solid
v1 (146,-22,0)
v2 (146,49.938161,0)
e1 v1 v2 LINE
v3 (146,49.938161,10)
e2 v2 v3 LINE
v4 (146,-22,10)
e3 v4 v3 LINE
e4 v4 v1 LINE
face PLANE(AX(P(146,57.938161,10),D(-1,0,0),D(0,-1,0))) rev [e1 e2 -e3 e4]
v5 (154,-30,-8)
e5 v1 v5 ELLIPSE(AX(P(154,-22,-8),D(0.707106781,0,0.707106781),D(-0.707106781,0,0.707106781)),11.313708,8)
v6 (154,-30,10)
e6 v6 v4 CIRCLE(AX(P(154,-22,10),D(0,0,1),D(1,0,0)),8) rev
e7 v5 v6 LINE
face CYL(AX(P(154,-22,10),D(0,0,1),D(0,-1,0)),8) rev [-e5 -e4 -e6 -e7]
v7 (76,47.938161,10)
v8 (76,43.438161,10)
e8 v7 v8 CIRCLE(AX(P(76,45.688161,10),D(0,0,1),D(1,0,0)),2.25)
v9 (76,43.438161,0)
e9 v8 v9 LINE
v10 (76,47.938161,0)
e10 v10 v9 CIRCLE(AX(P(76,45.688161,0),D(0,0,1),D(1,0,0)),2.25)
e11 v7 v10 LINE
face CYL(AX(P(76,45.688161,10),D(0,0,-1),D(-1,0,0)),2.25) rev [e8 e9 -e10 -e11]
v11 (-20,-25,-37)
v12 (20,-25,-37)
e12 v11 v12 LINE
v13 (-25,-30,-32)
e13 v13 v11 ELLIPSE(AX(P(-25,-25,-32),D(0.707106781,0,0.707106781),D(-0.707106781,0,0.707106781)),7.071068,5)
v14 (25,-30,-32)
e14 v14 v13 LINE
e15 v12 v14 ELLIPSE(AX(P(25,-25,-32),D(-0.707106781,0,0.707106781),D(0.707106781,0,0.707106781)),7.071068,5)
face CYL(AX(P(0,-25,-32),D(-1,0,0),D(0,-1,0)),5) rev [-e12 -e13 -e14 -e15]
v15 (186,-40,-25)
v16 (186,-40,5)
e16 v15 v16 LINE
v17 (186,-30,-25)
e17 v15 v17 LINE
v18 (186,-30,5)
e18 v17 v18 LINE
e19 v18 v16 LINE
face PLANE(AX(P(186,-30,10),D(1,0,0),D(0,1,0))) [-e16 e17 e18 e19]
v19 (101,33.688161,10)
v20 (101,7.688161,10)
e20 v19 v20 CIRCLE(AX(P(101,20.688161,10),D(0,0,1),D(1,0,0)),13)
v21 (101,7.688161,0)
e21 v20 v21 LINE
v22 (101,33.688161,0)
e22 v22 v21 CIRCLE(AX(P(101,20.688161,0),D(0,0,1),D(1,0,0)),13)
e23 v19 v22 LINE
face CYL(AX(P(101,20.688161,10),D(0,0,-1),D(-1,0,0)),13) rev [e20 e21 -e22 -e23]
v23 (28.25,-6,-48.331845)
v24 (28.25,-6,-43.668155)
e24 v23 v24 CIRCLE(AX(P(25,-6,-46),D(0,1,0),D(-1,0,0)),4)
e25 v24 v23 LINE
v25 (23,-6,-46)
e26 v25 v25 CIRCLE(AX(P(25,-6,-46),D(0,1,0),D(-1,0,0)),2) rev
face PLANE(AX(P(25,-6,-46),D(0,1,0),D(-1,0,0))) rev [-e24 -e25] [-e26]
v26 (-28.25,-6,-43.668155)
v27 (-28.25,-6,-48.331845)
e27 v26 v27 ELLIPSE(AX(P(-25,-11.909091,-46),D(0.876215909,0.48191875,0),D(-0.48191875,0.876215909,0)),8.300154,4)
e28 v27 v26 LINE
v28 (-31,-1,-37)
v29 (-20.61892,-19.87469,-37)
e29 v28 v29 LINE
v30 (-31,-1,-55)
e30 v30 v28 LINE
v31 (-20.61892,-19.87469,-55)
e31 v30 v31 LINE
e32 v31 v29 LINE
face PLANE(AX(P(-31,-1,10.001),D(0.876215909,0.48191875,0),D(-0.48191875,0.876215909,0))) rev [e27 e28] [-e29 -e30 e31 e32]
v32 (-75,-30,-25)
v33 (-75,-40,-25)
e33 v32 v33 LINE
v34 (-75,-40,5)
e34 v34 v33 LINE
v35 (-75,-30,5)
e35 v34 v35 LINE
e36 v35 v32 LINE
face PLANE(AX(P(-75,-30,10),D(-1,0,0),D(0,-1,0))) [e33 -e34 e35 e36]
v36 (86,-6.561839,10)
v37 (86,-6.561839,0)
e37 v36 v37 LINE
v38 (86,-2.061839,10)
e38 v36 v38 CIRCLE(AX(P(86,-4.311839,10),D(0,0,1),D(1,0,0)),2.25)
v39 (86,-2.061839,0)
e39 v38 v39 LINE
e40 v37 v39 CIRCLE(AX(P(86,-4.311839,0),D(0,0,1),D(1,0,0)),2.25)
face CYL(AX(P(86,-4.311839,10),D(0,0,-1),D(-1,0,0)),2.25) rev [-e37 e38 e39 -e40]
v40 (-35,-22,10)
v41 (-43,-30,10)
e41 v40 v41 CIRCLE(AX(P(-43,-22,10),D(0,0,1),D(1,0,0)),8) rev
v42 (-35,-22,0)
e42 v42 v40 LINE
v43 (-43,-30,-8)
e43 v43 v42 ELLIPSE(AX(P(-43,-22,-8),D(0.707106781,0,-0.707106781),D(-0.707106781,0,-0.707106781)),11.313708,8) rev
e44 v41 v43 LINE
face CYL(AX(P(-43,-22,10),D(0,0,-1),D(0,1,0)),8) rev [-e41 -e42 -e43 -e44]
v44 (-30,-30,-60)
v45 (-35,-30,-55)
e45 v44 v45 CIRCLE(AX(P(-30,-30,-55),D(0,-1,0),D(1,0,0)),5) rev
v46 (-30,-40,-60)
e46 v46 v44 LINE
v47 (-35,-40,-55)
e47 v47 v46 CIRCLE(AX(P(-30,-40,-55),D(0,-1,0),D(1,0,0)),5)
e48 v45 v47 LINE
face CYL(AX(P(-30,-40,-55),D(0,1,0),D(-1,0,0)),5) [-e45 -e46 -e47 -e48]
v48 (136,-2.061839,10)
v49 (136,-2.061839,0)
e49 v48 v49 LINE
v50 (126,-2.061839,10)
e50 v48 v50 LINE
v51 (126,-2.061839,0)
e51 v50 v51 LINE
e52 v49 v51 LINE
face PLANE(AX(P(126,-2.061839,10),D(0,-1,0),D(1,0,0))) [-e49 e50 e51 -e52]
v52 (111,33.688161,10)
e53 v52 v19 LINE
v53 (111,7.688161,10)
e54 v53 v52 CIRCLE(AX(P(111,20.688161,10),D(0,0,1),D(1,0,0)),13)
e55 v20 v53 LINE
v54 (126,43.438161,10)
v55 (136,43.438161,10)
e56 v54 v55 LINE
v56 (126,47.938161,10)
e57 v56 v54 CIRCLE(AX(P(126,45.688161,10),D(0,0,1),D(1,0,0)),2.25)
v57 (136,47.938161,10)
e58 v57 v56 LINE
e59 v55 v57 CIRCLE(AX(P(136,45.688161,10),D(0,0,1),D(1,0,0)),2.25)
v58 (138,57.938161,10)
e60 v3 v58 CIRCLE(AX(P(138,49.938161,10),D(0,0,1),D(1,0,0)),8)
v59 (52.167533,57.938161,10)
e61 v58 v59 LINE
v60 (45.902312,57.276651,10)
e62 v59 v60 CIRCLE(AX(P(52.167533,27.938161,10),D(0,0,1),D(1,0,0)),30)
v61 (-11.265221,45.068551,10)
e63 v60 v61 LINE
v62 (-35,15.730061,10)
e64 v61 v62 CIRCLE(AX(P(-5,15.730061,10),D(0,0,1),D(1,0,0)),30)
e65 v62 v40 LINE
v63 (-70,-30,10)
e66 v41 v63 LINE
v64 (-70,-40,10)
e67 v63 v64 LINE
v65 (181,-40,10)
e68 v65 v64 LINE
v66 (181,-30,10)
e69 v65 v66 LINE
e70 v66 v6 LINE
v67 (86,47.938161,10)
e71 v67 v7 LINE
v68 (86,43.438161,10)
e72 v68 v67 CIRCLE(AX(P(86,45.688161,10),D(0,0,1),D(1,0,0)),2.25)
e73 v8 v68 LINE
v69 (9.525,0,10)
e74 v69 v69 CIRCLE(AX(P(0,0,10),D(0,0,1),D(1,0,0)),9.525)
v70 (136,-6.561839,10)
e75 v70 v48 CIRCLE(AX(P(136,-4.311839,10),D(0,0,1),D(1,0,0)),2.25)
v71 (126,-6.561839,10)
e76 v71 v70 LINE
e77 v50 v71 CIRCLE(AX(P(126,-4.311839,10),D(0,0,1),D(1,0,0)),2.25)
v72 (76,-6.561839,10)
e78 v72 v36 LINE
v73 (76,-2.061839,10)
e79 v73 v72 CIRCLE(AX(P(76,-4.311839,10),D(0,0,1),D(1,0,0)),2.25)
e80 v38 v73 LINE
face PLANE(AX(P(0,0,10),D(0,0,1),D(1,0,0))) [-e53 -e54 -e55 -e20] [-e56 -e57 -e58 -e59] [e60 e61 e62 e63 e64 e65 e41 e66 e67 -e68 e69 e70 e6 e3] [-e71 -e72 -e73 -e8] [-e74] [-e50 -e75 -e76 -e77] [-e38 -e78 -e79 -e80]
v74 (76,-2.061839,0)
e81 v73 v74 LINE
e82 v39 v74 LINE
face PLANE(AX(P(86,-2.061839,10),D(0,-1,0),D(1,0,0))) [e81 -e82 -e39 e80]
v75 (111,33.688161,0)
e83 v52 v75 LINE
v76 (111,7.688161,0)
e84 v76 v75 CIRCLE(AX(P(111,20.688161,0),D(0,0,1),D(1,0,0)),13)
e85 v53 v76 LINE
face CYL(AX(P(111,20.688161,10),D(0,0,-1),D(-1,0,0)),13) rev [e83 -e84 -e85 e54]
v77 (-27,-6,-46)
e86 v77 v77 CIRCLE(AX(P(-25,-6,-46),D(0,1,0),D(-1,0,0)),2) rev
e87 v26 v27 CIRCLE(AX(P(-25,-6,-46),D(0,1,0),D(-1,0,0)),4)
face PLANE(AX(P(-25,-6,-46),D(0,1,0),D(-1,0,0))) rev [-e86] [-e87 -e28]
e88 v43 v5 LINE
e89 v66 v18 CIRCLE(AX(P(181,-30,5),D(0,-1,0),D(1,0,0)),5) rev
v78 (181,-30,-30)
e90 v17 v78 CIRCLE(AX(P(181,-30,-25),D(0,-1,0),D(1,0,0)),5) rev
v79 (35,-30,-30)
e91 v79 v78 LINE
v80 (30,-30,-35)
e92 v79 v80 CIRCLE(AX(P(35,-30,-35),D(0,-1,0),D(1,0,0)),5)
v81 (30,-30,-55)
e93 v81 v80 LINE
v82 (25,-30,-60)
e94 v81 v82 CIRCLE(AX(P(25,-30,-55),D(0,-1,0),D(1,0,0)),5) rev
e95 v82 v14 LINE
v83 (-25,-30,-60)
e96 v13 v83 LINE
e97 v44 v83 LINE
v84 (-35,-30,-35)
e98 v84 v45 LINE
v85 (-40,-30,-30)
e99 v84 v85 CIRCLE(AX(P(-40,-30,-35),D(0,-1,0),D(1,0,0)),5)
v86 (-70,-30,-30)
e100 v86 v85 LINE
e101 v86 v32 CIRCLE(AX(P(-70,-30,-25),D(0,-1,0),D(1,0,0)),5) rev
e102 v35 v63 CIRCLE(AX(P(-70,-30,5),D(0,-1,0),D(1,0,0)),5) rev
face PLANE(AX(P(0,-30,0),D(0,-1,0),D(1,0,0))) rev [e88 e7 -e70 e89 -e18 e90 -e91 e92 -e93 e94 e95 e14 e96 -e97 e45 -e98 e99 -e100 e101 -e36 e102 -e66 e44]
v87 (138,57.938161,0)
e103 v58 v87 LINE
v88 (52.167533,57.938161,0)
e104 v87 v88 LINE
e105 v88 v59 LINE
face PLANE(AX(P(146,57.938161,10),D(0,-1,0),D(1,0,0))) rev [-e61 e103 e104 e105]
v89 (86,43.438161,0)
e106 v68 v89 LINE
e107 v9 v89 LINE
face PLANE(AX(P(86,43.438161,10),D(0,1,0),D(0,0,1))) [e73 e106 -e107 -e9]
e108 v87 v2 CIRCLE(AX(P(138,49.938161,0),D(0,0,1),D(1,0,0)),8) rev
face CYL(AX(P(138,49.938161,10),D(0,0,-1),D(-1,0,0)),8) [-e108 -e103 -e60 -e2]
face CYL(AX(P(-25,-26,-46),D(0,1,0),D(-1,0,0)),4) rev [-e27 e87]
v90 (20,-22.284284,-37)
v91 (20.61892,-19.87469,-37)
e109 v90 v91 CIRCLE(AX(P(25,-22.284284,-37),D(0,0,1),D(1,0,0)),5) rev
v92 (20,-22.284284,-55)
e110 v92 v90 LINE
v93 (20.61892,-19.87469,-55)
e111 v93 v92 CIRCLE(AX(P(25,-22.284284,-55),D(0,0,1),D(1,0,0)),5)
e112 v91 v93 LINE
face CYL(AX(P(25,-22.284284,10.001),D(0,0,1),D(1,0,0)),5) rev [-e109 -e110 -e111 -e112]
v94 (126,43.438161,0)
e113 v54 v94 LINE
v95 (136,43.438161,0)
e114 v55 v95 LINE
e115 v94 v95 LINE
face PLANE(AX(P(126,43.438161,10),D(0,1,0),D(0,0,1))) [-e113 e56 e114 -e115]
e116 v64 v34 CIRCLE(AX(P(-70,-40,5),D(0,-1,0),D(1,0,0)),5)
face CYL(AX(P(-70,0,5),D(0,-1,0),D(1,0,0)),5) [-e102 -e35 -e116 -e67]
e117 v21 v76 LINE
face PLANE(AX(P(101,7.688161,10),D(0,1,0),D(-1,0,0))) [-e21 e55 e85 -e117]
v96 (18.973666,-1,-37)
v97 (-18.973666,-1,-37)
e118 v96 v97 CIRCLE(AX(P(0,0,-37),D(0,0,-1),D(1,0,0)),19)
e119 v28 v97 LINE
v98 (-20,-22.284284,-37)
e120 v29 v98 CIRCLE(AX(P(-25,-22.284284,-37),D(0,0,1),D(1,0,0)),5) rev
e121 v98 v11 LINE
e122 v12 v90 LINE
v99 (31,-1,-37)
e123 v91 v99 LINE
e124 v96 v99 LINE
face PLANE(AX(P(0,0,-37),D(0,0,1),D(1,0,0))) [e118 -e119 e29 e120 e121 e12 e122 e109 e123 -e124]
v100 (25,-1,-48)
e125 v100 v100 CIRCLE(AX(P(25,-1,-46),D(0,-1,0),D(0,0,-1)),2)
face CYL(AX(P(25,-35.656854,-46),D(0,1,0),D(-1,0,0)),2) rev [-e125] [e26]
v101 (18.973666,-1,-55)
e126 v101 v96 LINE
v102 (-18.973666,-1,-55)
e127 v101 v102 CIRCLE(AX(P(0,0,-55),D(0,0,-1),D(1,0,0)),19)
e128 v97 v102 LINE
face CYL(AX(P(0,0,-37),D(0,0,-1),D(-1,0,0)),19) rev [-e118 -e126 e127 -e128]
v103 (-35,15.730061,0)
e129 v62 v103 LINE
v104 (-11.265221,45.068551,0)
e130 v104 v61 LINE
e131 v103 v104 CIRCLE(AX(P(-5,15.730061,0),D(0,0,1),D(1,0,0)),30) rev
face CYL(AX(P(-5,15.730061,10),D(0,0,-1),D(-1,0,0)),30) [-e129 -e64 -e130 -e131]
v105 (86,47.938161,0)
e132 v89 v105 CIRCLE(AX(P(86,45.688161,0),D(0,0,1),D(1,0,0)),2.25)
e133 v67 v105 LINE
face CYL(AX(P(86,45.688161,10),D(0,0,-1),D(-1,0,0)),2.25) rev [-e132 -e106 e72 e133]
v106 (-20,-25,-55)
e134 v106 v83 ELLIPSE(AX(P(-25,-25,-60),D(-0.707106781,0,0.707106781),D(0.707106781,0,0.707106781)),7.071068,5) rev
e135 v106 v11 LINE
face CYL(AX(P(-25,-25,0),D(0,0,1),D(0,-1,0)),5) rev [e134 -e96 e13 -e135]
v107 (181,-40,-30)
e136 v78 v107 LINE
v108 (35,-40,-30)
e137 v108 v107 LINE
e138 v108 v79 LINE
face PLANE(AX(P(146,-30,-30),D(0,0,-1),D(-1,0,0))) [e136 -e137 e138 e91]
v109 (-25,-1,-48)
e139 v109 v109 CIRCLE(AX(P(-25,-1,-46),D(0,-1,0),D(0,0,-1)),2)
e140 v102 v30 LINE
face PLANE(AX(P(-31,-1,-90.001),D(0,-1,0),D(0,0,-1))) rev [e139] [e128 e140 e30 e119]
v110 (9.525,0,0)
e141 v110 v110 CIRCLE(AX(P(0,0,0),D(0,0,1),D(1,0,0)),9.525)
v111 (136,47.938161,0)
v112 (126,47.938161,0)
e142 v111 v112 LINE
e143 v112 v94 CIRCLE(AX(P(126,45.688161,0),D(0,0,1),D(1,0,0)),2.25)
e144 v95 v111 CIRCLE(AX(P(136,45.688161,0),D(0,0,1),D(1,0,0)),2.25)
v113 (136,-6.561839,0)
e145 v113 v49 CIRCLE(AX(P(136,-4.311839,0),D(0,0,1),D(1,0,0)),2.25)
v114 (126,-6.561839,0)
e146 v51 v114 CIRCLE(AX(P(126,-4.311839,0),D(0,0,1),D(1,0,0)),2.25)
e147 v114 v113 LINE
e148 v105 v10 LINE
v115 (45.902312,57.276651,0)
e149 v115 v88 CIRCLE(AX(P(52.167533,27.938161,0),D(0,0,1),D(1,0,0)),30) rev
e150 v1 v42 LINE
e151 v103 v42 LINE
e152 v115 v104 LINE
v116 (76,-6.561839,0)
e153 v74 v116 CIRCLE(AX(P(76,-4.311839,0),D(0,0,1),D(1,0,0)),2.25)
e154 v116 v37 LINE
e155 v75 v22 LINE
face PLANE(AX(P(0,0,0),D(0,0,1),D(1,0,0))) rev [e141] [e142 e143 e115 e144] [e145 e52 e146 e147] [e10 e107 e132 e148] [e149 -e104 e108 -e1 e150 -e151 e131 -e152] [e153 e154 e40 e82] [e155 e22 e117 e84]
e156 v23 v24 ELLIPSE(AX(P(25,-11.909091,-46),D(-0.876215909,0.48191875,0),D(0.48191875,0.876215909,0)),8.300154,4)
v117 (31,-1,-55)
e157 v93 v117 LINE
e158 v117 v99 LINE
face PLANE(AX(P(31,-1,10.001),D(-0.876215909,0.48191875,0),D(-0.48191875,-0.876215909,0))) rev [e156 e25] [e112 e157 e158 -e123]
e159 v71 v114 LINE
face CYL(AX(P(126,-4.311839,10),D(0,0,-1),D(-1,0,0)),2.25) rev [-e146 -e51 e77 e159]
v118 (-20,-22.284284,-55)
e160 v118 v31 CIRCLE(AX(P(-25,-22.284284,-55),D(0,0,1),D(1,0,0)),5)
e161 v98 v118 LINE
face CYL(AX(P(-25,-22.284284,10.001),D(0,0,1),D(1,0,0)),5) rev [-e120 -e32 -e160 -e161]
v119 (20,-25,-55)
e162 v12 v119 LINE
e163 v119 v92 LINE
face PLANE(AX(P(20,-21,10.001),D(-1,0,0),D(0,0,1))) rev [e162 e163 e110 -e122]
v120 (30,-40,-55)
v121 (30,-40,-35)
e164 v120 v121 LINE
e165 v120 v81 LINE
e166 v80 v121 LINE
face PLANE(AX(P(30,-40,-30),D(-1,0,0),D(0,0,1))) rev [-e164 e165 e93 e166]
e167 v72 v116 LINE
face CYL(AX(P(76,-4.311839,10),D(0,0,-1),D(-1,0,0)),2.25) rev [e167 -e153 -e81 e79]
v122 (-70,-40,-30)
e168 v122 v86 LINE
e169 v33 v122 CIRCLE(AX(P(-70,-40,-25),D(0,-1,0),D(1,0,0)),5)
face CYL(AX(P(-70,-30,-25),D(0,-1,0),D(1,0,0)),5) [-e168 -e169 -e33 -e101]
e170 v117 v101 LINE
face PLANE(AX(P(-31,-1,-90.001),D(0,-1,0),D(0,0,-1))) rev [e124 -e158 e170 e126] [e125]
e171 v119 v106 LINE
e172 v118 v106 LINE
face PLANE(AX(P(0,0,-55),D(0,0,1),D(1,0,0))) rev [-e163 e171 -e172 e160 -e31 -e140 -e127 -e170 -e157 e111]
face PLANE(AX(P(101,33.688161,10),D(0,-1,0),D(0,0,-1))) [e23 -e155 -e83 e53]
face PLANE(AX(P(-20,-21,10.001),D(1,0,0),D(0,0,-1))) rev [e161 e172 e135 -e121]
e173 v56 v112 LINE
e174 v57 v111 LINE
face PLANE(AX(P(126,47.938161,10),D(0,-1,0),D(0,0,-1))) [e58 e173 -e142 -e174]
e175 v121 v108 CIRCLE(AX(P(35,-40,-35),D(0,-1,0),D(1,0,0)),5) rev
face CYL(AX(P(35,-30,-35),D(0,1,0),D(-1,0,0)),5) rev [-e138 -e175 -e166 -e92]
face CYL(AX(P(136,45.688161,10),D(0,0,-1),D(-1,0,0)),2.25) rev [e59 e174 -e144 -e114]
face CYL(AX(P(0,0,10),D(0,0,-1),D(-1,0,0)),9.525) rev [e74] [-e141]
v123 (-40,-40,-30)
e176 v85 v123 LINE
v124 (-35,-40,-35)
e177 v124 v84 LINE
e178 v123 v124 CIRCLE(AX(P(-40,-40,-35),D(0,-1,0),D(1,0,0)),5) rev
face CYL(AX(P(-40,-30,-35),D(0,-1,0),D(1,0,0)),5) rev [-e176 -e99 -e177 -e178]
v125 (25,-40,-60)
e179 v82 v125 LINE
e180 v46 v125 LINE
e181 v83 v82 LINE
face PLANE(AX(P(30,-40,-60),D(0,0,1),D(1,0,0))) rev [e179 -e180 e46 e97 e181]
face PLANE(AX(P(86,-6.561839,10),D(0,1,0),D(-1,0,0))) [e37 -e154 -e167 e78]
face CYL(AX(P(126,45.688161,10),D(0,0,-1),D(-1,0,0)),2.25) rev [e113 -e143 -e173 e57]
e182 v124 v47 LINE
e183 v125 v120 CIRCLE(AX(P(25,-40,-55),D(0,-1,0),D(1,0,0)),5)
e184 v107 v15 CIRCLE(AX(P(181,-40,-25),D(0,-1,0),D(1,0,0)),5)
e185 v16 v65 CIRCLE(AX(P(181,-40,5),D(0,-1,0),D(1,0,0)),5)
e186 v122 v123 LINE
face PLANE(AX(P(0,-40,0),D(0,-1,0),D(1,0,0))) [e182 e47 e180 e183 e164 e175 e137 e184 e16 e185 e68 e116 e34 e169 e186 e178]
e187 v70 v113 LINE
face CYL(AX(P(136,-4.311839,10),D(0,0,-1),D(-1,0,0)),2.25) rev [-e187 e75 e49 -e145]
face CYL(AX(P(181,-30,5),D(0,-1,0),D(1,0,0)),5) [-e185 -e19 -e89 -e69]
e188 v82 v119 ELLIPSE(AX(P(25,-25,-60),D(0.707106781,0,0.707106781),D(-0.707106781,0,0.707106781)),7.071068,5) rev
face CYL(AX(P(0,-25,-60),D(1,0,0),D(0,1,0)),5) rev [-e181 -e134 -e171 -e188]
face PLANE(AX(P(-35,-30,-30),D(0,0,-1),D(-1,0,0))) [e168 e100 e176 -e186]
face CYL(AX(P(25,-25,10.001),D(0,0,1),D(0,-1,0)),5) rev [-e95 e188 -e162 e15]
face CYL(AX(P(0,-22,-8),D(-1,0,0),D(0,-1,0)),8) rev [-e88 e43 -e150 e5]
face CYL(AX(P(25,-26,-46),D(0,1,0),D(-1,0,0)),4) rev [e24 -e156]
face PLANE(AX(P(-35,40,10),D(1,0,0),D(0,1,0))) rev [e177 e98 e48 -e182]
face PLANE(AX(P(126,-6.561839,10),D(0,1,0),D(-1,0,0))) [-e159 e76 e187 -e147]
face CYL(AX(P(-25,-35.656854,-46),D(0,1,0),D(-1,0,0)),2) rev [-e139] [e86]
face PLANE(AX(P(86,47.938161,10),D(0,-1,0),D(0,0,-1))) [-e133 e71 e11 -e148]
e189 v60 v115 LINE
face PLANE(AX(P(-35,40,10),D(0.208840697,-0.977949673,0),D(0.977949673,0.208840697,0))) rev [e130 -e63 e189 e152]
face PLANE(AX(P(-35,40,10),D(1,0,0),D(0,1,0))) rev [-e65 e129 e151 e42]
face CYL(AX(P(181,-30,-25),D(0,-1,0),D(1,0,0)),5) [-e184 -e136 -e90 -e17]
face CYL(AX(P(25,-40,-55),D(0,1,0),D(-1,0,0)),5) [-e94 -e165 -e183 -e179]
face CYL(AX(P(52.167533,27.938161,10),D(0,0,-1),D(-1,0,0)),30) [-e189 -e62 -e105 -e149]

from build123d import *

# Parameters (mm, degrees)
SKETCH1_R           = 9.525
BOSS_EXTRUDE1_DEPTH = 10
SKETCH2_W           = 181
SKETCH2_H           = 100
BOSS_EXTRUDE2_DEPTH = 10
BOSS_EXTRUDE3_DEPTH = 18
SKETCH4_R           = 2
CUT_EXTRUDE1_DEPTH  = 30
SKETCH5_R           = 4
CUT_EXTRUDE2_DEPTH  = 20
CUT_EXTRUDE4_START  = -18
SKETCH8_W           = 62
SKETCH8_H           = 1
CUT_EXTRUDE4_DEPTH  = 18
CUT_EXTRUDE3_REACH  = 171.994
FILLET1_R           = 5
SKETCH9_W           = 40
SKETCH9_H           = 40
BOSS_EXTRUDE5_DEPTH = 10
CUT_EXTRUDE6_DEPTH  = 225.56428954
FILLET2_R           = 5
FILLET3_R           = 5
FILLET4_R           = 8
FILLET5_R           = 30


with BuildPart() as part:
    # Sketch1 → Boss-Extrude1 (new body)
    with BuildSketch(Plane.XY):
        Polygon((146, 57.938160866), (146, -30), (-35, -30), (-35, 40), (49, 57.938160866), align=None)
        Circle(SKETCH1_R, mode=Mode.SUBTRACT)
        with BuildLine():
            Line((101, 33.688160866), (111, 33.688160866))
            ThreePointArc((111, 33.688160866), (124, 20.688160866), (111, 7.688160866))
            Line((111, 7.688160866), (101, 7.688160866))
            ThreePointArc((101, 7.688160866), (88, 20.688160866), (101, 33.688160866))
        make_face(mode=Mode.SUBTRACT)
        with BuildLine():
            Line((86, 43.438160866), (76, 43.438160866))
            ThreePointArc((76, 43.438160866), (73.75, 45.688160866), (76, 47.938160866))
            Line((76, 47.938160866), (86, 47.938160866))
            ThreePointArc((86, 47.938160866), (88.25, 45.688160866), (86, 43.438160866))
        make_face(mode=Mode.SUBTRACT)
        with BuildLine():
            Line((86, -6.561839134), (76, -6.561839134))
            ThreePointArc((76, -6.561839134), (73.75, -4.311839134), (76, -2.061839134))
            Line((76, -2.061839134), (86, -2.061839134))
            ThreePointArc((86, -2.061839134), (88.25, -4.311839134), (86, -6.561839134))
        make_face(mode=Mode.SUBTRACT)
        with BuildLine():
            Line((126, -2.061839134), (136, -2.061839134))
            ThreePointArc((136, -2.061839134), (138.25, -4.311839134), (136, -6.561839134))
            Line((136, -6.561839134), (126, -6.561839134))
            ThreePointArc((126, -6.561839134), (123.75, -4.311839134), (126, -2.061839134))
        make_face(mode=Mode.SUBTRACT)
        with BuildLine():
            Line((126, 47.938160866), (136, 47.938160866))
            ThreePointArc((136, 47.938160866), (138.25, 45.688160866), (136, 43.438160866))
            Line((136, 43.438160866), (126, 43.438160866))
            ThreePointArc((126, 43.438160866), (123.75, 45.688160866), (126, 47.938160866))
        make_face(mode=Mode.SUBTRACT)
    extrude(amount=BOSS_EXTRUDE1_DEPTH)

    # Sketch2 → Boss-Extrude2 (add)
    with BuildSketch(Plane.XZ.offset(30)):
        with Locations((55.5, -40)):
            Rectangle(SKETCH2_W, SKETCH2_H)
    extrude(amount=BOSS_EXTRUDE2_DEPTH)

    # Sketch3 → Boss-Extrude3 (add)
    with BuildSketch(Plane.XY.offset(-55)):
        with BuildLine():
            Line((-31, 0), (-31, -40))
            Line((-31, -40), (31, -40))
            Line((31, -40), (31, 0))
            Line((31, 0), (19, 0))
            ThreePointArc((19, 0), (0, -19), (-19, 0))
            Line((-19, 0), (-31, 0))
        make_face()
    extrude(amount=BOSS_EXTRUDE3_DEPTH)

    # Sketch4 → Cut-Extrude1 (cut)
    with BuildSketch(Plane(origin=(0, 0, 0), x_dir=(1, 0, 0), z_dir=(0, 1, 0))):
        with Locations(Location((-25, 46, 0), (0, 0, 180))):
            Circle(SKETCH4_R)
        with Locations(Location((25, 46, 0), (0, 0, 180))):
            Circle(SKETCH4_R)
    extrude(amount=-CUT_EXTRUDE1_DEPTH, mode=Mode.SUBTRACT)

    # Sketch5 → Cut-Extrude2 (cut)
    with BuildSketch(Plane(origin=(0, -6, 0), x_dir=(1, 0, 0), z_dir=(0, 1, 0))):
        with Locations(Location((25, 46, 0), (0, 0, 180))):
            Circle(SKETCH5_R)
        with Locations(Location((-25, 46, 0), (0, 0, 180))):
            Circle(SKETCH5_R)
    extrude(amount=-CUT_EXTRUDE2_DEPTH, mode=Mode.SUBTRACT)

    # Sketch8 → Cut-Extrude4 (cut)
    with BuildSketch(Plane.XY.offset(-37).offset(CUT_EXTRUDE4_START)):
        with Locations((0, -0.5)):
            Rectangle(SKETCH8_W, SKETCH8_H)
    extrude(amount=CUT_EXTRUDE4_DEPTH, mode=Mode.SUBTRACT)

    # Sketch6 → Cut-Extrude3 (cut, up to next)
    with BuildSketch(Plane(origin=(0, 0, -55), x_dir=(-1, 0, 0), z_dir=(0, 0, -1)), mode=Mode.PRIVATE) as cut_extrude3_sk1:
        Polygon((31, -1), (20, -21), (20, -30), (31, -30), align=None)
    cut_extrude3_tool1 = extrude(cut_extrude3_sk1.sketch, amount=-CUT_EXTRUDE3_REACH, mode=Mode.PRIVATE) & part.part
    # Sketch6 → Cut-Extrude3 (cut, up to next)
    with BuildSketch(Plane(origin=(0, 0, -55), x_dir=(-1, 0, 0), z_dir=(0, 0, -1)), mode=Mode.PRIVATE) as cut_extrude3_sk2:
        Polygon((-31, -1), (-20, -21), (-20, -30), (-31, -30), align=None)
    cut_extrude3_tool2 = extrude(cut_extrude3_sk2.sketch, amount=-CUT_EXTRUDE3_REACH, mode=Mode.PRIVATE) & part.part
    add(cut_extrude3_tool1.solids().sort_by_distance((-26.464912, -19.622807, -55))[0], mode=Mode.SUBTRACT)
    add(cut_extrude3_tool2.solids().sort_by_distance((26.464912, -19.622807, -55))[0], mode=Mode.SUBTRACT)

    # Fillet1
    fillet1_edges = [part.edges().sort_by_distance(p)[0] for p in [
        (-20, -21, -46),
        (-20, -30, -46),
        (20, -30, -46),
        (20, -21, -46),
    ]]
    fillet(fillet1_edges, radius=FILLET1_R)

    # Sketch9 → Boss-Extrude5 (add)
    with BuildSketch(Plane.XZ.offset(40)):
        with Locations((-55, -10)):
            Rectangle(SKETCH9_W, SKETCH9_H)
        with Locations((166, -10)):
            Rectangle(SKETCH9_W, SKETCH9_H)
    extrude(amount=-BOSS_EXTRUDE5_DEPTH)

    # Sketch10 → Cut-Extrude6 (cut, through all)
    with BuildSketch(Plane(origin=(0, -30, 0), x_dir=(1, 0, 0), z_dir=(0, 1, 0))):
        Polygon((30, 30), (30, 60), (-35, 60), (-35, 90), (146, 90), (146, 30), align=None)
    extrude(amount=-CUT_EXTRUDE6_DEPTH, mode=Mode.SUBTRACT)

    # Fillet2
    fillet2_edges = [part.edges().sort_by_distance(p)[0] for p in [
        (-35, -35, -30),
        (-75, -35, -30),
        (-75, -35, 10),
        (186, -35, 10),
        (186, -35, -30),
        (-35, -35, -60),
        (30, -35, -30),
        (30, -35, -60),
    ]]
    fillet(fillet2_edges, radius=FILLET2_R)

    # Fillet3
    fillet3_edges = [part.edges().sort_by_distance(p)[0] for p in [
        (0, -30, -55),
        (0, -30, -37),
    ]]
    fillet(fillet3_edges, radius=FILLET3_R - 0.0001)  # a hair under: the kernel refuses the full size

    # Fillet4
    fillet4_edges = [part.edges().sort_by_distance(p)[0] for p in [
        (-35, -30, 5),
        (146, -30, 5),
        (55.5, -30, 0),
        (146, 57.938160866, 5),
    ]]
    fillet(fillet4_edges, radius=FILLET4_R)

    # Fillet5
    fillet5_edges = [part.edges().sort_by_distance(p)[0] for p in [
        (-35, 40, 5),
        (49, 57.938160866, 5),
    ]]
    fillet(fillet5_edges, radius=FILLET5_R)


solid = part.part
